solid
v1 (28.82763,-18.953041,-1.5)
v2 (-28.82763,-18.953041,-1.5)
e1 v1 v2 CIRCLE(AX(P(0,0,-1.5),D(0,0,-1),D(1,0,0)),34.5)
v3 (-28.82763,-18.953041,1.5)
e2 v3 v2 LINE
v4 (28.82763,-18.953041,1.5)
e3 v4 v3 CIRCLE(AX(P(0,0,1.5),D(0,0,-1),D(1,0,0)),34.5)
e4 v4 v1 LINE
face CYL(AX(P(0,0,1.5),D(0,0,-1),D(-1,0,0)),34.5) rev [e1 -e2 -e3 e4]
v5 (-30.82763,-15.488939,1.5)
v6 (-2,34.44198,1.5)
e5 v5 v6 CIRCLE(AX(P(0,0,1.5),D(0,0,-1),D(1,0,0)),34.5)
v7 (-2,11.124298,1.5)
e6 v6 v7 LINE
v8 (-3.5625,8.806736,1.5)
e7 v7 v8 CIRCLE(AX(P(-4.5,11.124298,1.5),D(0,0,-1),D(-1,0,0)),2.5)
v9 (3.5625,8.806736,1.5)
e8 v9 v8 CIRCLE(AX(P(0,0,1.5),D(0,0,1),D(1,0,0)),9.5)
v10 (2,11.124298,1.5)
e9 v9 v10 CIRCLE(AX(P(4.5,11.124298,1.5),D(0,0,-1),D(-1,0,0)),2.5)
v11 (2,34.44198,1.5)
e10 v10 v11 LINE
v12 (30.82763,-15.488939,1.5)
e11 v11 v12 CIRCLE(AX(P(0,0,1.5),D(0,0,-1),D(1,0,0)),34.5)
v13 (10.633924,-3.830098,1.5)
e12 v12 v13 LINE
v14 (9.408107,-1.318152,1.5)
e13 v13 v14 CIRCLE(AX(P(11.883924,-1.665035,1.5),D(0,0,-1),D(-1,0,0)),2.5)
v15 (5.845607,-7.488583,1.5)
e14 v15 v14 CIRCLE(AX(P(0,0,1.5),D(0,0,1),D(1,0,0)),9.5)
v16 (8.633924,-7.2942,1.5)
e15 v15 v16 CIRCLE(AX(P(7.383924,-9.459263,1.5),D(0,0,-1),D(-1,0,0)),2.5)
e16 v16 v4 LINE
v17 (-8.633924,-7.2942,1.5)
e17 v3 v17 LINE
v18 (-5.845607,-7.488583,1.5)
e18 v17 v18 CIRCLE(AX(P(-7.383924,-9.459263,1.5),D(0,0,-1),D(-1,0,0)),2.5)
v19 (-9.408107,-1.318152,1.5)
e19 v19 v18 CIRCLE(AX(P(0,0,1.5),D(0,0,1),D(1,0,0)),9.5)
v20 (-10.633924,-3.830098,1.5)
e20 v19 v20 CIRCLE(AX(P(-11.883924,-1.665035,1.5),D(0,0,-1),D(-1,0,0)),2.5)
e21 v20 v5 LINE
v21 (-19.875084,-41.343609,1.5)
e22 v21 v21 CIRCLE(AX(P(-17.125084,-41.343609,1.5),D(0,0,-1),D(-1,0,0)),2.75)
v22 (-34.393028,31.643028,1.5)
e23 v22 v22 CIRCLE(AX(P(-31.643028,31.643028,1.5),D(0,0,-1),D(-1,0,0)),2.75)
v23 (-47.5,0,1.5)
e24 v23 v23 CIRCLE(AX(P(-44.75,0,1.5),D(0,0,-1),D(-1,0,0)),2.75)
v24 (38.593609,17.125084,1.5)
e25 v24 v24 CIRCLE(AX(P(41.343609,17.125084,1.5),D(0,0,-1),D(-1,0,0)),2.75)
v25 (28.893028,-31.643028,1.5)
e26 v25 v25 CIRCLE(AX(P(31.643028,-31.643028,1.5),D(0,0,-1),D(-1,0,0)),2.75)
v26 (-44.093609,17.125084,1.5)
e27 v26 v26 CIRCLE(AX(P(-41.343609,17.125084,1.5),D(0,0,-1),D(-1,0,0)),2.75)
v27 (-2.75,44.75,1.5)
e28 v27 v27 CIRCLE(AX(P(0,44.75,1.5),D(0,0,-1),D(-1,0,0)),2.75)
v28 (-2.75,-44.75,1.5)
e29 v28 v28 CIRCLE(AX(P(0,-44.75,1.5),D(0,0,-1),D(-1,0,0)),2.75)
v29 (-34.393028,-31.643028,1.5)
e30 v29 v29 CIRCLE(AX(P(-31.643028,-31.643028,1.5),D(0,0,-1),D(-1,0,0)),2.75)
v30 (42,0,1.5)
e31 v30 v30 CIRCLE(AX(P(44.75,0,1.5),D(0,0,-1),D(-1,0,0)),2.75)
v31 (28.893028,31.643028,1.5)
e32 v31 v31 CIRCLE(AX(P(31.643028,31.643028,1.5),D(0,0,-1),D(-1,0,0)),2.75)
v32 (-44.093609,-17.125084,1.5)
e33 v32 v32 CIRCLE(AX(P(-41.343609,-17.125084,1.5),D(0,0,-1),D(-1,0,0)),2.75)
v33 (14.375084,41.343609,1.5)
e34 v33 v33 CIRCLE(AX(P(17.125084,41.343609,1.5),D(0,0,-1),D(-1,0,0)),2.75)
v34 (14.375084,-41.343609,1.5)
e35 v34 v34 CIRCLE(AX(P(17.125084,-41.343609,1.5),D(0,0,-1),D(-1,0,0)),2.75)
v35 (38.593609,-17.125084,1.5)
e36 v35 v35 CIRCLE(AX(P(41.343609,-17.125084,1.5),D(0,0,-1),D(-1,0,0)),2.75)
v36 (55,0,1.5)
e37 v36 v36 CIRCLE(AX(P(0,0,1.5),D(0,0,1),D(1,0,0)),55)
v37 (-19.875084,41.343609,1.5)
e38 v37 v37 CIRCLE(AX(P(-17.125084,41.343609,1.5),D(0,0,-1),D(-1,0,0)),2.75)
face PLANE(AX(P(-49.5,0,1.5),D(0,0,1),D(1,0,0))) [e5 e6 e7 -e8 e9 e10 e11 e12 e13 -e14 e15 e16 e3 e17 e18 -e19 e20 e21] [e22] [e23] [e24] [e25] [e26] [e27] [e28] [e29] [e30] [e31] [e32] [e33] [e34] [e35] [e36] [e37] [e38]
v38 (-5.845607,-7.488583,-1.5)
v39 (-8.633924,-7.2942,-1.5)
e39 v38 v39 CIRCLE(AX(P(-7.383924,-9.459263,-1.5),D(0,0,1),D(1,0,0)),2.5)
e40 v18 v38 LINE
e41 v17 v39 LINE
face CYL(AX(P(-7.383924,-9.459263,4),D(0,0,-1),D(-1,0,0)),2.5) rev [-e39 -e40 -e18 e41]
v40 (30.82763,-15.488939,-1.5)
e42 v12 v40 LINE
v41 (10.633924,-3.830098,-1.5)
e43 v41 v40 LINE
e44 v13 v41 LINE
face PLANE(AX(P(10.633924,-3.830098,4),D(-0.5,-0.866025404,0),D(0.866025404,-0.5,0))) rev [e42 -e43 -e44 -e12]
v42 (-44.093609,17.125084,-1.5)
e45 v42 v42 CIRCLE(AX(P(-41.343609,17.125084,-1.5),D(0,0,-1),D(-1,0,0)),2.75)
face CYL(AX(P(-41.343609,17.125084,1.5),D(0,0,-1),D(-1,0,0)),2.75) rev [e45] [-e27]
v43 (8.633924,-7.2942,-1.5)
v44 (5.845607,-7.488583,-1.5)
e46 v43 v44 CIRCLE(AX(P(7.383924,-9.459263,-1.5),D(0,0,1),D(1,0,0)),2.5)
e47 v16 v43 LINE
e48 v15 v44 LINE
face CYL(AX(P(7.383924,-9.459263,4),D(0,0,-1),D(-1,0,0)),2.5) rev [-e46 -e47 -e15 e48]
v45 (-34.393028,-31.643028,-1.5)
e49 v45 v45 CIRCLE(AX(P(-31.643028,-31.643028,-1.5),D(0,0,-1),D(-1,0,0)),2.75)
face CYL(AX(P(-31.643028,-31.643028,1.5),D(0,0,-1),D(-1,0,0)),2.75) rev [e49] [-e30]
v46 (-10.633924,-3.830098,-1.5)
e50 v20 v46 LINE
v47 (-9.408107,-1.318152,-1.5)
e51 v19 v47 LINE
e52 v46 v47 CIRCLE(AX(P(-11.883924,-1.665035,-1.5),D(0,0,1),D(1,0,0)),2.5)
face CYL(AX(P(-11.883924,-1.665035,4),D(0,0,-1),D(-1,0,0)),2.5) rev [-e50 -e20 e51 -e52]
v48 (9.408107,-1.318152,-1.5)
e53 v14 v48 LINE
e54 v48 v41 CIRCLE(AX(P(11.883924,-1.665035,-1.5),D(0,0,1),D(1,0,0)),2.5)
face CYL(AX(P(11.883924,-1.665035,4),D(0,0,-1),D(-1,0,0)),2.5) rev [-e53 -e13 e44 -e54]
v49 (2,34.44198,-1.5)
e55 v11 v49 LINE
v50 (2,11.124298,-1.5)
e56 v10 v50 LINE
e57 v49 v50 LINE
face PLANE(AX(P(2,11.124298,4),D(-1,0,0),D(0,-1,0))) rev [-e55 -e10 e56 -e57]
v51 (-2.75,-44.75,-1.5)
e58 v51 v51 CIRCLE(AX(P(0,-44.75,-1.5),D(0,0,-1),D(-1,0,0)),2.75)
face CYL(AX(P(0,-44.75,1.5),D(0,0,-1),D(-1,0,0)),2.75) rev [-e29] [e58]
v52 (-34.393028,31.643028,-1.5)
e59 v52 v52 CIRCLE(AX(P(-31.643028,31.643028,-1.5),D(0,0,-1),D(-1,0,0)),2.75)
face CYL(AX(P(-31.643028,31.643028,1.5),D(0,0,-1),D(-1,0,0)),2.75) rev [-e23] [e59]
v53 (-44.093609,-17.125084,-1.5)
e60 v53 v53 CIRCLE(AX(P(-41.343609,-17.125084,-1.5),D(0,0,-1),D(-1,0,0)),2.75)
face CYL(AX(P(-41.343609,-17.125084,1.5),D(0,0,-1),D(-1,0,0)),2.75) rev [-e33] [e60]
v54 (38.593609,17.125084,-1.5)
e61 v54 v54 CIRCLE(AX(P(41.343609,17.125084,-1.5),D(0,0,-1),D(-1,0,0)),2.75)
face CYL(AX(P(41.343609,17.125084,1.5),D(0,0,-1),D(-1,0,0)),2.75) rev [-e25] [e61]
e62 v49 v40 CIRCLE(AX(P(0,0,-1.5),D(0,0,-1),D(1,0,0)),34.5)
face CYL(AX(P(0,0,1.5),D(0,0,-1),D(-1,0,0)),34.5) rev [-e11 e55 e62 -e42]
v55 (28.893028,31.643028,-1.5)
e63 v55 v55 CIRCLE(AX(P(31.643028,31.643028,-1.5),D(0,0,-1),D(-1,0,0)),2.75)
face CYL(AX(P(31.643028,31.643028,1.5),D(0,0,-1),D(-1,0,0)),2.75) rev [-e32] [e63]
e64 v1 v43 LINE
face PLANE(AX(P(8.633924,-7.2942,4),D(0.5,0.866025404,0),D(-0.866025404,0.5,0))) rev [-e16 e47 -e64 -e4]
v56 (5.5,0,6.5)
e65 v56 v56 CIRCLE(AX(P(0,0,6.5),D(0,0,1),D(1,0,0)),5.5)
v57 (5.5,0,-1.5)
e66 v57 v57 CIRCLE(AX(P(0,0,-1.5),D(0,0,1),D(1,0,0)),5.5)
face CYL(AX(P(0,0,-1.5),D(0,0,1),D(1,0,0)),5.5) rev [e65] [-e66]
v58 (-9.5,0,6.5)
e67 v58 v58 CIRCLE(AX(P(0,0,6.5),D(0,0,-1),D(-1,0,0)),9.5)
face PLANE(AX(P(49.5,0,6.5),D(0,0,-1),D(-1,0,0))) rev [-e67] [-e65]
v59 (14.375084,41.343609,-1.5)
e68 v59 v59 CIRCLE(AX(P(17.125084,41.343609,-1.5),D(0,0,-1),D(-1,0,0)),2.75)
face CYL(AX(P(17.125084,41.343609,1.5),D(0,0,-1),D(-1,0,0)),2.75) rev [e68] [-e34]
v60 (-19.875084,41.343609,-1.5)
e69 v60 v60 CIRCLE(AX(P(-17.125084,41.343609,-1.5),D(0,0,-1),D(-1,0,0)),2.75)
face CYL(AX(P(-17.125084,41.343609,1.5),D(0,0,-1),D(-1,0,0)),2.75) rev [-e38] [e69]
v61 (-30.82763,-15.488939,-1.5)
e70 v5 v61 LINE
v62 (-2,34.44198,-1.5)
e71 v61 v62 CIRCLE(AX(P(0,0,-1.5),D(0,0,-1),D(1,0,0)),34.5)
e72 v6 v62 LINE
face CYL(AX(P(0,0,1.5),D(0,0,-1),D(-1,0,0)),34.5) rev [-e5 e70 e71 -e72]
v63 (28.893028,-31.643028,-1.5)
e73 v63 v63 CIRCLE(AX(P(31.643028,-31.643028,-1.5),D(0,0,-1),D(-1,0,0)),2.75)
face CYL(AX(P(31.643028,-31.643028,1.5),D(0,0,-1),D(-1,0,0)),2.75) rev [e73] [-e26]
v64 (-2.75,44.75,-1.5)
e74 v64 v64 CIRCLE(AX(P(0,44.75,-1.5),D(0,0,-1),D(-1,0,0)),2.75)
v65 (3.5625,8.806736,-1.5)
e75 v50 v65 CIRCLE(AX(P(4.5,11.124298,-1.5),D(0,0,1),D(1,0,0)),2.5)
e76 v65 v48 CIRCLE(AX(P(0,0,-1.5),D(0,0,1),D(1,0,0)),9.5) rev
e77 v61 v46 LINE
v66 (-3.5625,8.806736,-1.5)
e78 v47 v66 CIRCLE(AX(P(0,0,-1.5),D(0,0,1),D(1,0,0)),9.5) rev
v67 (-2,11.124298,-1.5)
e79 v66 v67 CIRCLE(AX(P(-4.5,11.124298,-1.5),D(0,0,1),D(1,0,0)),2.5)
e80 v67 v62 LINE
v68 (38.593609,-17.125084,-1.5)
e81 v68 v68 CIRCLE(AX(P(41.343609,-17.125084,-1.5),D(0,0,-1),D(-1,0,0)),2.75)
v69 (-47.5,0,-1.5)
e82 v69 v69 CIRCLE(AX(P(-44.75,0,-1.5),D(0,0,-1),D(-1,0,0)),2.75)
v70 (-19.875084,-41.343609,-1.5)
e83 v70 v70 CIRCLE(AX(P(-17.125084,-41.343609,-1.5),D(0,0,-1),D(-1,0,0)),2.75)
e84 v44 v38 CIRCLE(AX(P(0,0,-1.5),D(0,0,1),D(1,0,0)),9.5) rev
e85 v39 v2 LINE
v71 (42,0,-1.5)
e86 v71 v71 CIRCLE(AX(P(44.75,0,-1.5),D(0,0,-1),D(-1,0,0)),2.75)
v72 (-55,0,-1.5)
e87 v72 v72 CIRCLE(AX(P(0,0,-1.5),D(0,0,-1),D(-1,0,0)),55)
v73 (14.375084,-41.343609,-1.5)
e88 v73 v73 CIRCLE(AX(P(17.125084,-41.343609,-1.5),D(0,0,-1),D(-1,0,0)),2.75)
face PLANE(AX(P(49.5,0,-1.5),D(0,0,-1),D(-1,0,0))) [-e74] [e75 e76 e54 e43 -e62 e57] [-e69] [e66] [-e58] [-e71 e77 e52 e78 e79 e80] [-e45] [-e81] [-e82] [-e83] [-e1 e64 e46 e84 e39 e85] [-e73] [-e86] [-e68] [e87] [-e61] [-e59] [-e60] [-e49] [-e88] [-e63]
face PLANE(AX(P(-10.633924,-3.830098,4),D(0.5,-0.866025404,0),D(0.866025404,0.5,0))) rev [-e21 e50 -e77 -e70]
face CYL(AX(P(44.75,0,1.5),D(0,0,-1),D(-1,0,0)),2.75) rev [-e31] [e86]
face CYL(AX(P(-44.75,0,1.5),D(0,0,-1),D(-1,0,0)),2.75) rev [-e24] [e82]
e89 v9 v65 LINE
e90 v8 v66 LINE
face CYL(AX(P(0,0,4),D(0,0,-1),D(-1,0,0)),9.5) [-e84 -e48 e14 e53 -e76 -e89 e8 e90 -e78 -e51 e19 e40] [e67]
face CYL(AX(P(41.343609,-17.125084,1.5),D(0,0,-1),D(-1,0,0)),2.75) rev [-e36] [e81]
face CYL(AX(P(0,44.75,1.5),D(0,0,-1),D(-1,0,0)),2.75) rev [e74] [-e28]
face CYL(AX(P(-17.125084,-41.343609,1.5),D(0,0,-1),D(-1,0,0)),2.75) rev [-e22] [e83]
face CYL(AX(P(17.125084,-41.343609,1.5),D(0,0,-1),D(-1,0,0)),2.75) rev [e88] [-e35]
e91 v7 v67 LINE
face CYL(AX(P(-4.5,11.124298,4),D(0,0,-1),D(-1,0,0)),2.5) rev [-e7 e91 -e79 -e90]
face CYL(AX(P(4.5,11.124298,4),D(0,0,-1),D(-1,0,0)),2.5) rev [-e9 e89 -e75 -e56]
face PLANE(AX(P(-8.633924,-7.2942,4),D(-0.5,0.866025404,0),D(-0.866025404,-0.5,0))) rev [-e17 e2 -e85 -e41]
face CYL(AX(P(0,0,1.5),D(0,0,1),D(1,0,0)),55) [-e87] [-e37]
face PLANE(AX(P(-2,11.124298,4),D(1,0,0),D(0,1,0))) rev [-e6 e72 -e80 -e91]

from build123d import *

# Parameters (mm, degrees)
FILLET1_R               = 0.5
CUT_EXTRUDE1_DEPTH      = 78.97595784
CIRPATTERN1_COUNT       = 3
CUT_EXTRUDE2_DEPTH      = 78.975957833
CUT_EXTRUDE2_DEPTH_BACK = 78.975957833
SKETCH3_R               = 3
BOSS_EXTRUDE1_DEPTH     = 1.5
CUT_EXTRUDE3_DEPTH      = 78.839578622
CUT_EXTRUDE3_DEPTH_BACK = 78.839578622
SKETCH6_R               = 2.75
SKETCH7_R               = 9.5
SKETCH7_R_2             = 3
BOSS_EXTRUDE2_DEPTH     = 5
CUT_EXTRUDE5_DEPTH      = 78.942286341
CUT_EXTRUDE5_DEPTH_BACK = 78.942286341
SKETCH9_R               = 5.5


# Read off the part's stored shape, not the designer's step: Split1, Split2
with BuildPart() as part:
    # Sketch1 → Revolve1 (revolve)
    with BuildSketch(Plane(origin=(0, 0, 0), x_dir=(0, 0, -1), z_dir=(1, 0, 0)), mode=Mode.PRIVATE) as revolve1_sk:
        Polygon((-4, 55), (4, 55), (4, 50), (1.5, 50), (1.5, 0), (-1.5, 0), (-1.5, 50), (-4, 50), align=None)
    revolve(revolve1_sk.sketch.rotate(Axis((0, 0, 1.5), (0, 0, -1)), 90), axis=Axis((0, 0, 1.5), (0, 0, -1)))

    # Fillet1
    fillet1_edges = [part.edges().sort_by_distance(p)[0] for p in [
        (-50, 0, -1.5),
        (-50, 0, -4),
        (-55, 0, -4),
        (-55, 0, 4),
        (-50, 0, 4),
        (-50, 0, 1.5),
    ]]
    fillet(fillet1_edges, radius=FILLET1_R)

    # Sketch2 → Cut-Extrude1 (cut, symmetric)
    with BuildSketch(Plane(origin=(0, 0, -1.5), x_dir=(-1, 0, 0), z_dir=(0, 0, -1))):
        with BuildLine():
            Line((10.633924434, -3.830098058), (41.516200464, -21.659988437))
            ThreePointArc((41.516200464, -21.659988437), (43.528240329, -21.875953118), (45.040998361, -20.531889019))
            ThreePointArc((45.040998361, -20.531889019), (42.868257487, 24.75), (4.739361702, 49.272593302))
            ThreePointArc((4.739361702, 49.272593302), (2.818989033, 48.634538466), (2, 46.784078488))
            Line((2, 46.784078488), (2, 11.124297731))
            ThreePointArc((2, 11.124297731), (2.427109506, 9.726755245), (3.5625, 8.806735703))
            ThreePointArc((3.5625, 8.806735703), (8.227241336, 4.75), (9.408106844, -1.318152351))
            ThreePointArc((9.408106844, -1.318152351), (9.637171891, -2.761439132), (10.633924434, -3.830098058))
        make_face()
    cut_extrude1 = extrude(amount=CUT_EXTRUDE1_DEPTH, both=True, mode=Mode.SUBTRACT)

    # CirPattern1: Cut-Extrude1 ×3 about axis
    cirpattern1_axis = Axis((0, 0, 0), (0, 0, 1))
    for i in range(1, CIRPATTERN1_COUNT):
        add(cut_extrude1.rotate(cirpattern1_axis, i * 360 / CIRPATTERN1_COUNT), mode=Mode.SUBTRACT)

    # Sketch3 → Cut-Extrude2 (cut, two sides: drawn at the far end of the back side and taken through both)
    with BuildSketch(Plane.XY.offset(1.5).offset(-CUT_EXTRUDE2_DEPTH_BACK)):
        Circle(SKETCH3_R)
    extrude(amount=CUT_EXTRUDE2_DEPTH + CUT_EXTRUDE2_DEPTH_BACK, mode=Mode.SUBTRACT)

    # Sketch4 → Boss-Extrude1 (add, symmetric)
    with BuildSketch(Plane.XY):
        with BuildLine():
            Line((-2, 46.784078488), (-2, 34.441980199))
            ThreePointArc((-2, 34.441980199), (-29.877876431, 17.25), (-30.827629809, -15.488939292))
            Line((-30.827629809, -15.488939292), (-41.516200464, -21.659988437))
            ThreePointArc((-41.516200464, -21.659988437), (-43.528240329, -21.875953118), (-45.040998361, -20.531889019))
            ThreePointArc((-45.040998361, -20.531889019), (-42.868257487, 24.75), (-4.739361702, 49.272593302))
            ThreePointArc((-4.739361702, 49.272593302), (-2.818989033, 48.634538466), (-2, 46.784078488))
        make_face()
        with BuildLine():
            Line((2, 34.441980199), (2, 46.784078488))
            ThreePointArc((2, 46.784078488), (2.818989033, 48.634538466), (4.739361702, 49.272593302))
            ThreePointArc((4.739361702, 49.272593302), (42.868257487, 24.75), (45.040998361, -20.531889019))
            ThreePointArc((45.040998361, -20.531889019), (43.528240329, -21.875953118), (41.516200464, -21.659988437))
            Line((41.516200464, -21.659988437), (30.827629809, -15.488939292))
            ThreePointArc((30.827629809, -15.488939292), (29.877876431, 17.25), (2, 34.441980199))
        make_face()
        with BuildLine():
            Line((28.827629809, -18.953040907), (39.516200464, -25.124090052))
            ThreePointArc((39.516200464, -25.124090052), (40.709251296, -26.758585348), (40.301636658, -28.740704283))
            ThreePointArc((40.301636658, -28.740704283), (0, -49.5), (-40.301636658, -28.740704283))
            ThreePointArc((-40.301636658, -28.740704283), (-40.709251296, -26.758585348), (-39.516200464, -25.124090052))
            Line((-39.516200464, -25.124090052), (-28.827629809, -18.953040907))
            ThreePointArc((-28.827629809, -18.953040907), (0, -34.5), (28.827629809, -18.953040907))
        make_face()
    extrude(amount=BOSS_EXTRUDE1_DEPTH, both=True)


with BuildPart() as body_2:
    # Split1: the piece on the far side of the plane
    add(part.part)
    split(bisect_by=Plane.XY.offset(1.5), keep=Keep.BOTTOM)


with BuildPart() as part_1:
    add(part.part)

    # Split1
    split(bisect_by=Plane.XY.offset(1.5), keep=Keep.TOP)


with BuildPart() as body_3:
    # Split2: the piece on the far side of the plane
    add(body_2.part)
    split(bisect_by=Plane.XY.offset(-1.5), keep=Keep.BOTTOM)


with BuildPart() as body_2_1:
    add(body_2.part)

    # Split2
    split(bisect_by=Plane.XY.offset(-1.5), keep=Keep.TOP)

    # Sketch6 → Cut-Extrude3 (cut, two sides: drawn at the far end of the back side and taken through both)
    with BuildSketch(Plane(origin=(0, 0, -1.5), x_dir=(-1, 0, 0), z_dir=(0, 0, -1)).offset(-CUT_EXTRUDE3_DEPTH_BACK)):
        with Locations((-44.75, 0)):
            Circle(SKETCH6_R)
        with Locations((-41.34360908, 17.125083598)):
            Circle(SKETCH6_R)
        with Locations((-31.643028458, 31.643028458)):
            Circle(SKETCH6_R)
        with Locations((-17.125083598, 41.34360908)):
            Circle(SKETCH6_R)
        with Locations((0, 44.75)):
            Circle(SKETCH6_R)
        with Locations((17.125083598, 41.34360908)):
            Circle(SKETCH6_R)
        with Locations((31.643028458, 31.643028458)):
            Circle(SKETCH6_R)
        with Locations((41.34360908, 17.125083598)):
            Circle(SKETCH6_R)
        with Locations((44.75, 0)):
            Circle(SKETCH6_R)
        with Locations((41.34360908, -17.125083598)):
            Circle(SKETCH6_R)
        with Locations((31.643028458, -31.643028458)):
            Circle(SKETCH6_R)
        with Locations((17.125083598, -41.34360908)):
            Circle(SKETCH6_R)
        with Locations((0, -44.75)):
            Circle(SKETCH6_R)
        with Locations((-17.125083598, -41.34360908)):
            Circle(SKETCH6_R)
        with Locations((-31.643028458, -31.643028458)):
            Circle(SKETCH6_R)
        with Locations((-41.34360908, -17.125083598)):
            Circle(SKETCH6_R)
    extrude(amount=CUT_EXTRUDE3_DEPTH + CUT_EXTRUDE3_DEPTH_BACK, mode=Mode.SUBTRACT)

    # Sketch7 → Boss-Extrude2 (add)
    with BuildSketch(Plane.XY.offset(1.5)):
        with Locations(Location((0, 0, 0), (0, 0, 180))):
            Circle(SKETCH7_R)
        Circle(SKETCH7_R_2, mode=Mode.SUBTRACT)
    extrude(amount=BOSS_EXTRUDE2_DEPTH)

    # Sketch9 → Cut-Extrude5 (cut, two sides: drawn at the far end of the back side and taken through both)
    with BuildSketch(Plane.XY.offset(1.5).offset(-CUT_EXTRUDE5_DEPTH_BACK)):
        Circle(SKETCH9_R)
    extrude(amount=CUT_EXTRUDE5_DEPTH + CUT_EXTRUDE5_DEPTH_BACK, mode=Mode.SUBTRACT)


solid = body_2_1.part
